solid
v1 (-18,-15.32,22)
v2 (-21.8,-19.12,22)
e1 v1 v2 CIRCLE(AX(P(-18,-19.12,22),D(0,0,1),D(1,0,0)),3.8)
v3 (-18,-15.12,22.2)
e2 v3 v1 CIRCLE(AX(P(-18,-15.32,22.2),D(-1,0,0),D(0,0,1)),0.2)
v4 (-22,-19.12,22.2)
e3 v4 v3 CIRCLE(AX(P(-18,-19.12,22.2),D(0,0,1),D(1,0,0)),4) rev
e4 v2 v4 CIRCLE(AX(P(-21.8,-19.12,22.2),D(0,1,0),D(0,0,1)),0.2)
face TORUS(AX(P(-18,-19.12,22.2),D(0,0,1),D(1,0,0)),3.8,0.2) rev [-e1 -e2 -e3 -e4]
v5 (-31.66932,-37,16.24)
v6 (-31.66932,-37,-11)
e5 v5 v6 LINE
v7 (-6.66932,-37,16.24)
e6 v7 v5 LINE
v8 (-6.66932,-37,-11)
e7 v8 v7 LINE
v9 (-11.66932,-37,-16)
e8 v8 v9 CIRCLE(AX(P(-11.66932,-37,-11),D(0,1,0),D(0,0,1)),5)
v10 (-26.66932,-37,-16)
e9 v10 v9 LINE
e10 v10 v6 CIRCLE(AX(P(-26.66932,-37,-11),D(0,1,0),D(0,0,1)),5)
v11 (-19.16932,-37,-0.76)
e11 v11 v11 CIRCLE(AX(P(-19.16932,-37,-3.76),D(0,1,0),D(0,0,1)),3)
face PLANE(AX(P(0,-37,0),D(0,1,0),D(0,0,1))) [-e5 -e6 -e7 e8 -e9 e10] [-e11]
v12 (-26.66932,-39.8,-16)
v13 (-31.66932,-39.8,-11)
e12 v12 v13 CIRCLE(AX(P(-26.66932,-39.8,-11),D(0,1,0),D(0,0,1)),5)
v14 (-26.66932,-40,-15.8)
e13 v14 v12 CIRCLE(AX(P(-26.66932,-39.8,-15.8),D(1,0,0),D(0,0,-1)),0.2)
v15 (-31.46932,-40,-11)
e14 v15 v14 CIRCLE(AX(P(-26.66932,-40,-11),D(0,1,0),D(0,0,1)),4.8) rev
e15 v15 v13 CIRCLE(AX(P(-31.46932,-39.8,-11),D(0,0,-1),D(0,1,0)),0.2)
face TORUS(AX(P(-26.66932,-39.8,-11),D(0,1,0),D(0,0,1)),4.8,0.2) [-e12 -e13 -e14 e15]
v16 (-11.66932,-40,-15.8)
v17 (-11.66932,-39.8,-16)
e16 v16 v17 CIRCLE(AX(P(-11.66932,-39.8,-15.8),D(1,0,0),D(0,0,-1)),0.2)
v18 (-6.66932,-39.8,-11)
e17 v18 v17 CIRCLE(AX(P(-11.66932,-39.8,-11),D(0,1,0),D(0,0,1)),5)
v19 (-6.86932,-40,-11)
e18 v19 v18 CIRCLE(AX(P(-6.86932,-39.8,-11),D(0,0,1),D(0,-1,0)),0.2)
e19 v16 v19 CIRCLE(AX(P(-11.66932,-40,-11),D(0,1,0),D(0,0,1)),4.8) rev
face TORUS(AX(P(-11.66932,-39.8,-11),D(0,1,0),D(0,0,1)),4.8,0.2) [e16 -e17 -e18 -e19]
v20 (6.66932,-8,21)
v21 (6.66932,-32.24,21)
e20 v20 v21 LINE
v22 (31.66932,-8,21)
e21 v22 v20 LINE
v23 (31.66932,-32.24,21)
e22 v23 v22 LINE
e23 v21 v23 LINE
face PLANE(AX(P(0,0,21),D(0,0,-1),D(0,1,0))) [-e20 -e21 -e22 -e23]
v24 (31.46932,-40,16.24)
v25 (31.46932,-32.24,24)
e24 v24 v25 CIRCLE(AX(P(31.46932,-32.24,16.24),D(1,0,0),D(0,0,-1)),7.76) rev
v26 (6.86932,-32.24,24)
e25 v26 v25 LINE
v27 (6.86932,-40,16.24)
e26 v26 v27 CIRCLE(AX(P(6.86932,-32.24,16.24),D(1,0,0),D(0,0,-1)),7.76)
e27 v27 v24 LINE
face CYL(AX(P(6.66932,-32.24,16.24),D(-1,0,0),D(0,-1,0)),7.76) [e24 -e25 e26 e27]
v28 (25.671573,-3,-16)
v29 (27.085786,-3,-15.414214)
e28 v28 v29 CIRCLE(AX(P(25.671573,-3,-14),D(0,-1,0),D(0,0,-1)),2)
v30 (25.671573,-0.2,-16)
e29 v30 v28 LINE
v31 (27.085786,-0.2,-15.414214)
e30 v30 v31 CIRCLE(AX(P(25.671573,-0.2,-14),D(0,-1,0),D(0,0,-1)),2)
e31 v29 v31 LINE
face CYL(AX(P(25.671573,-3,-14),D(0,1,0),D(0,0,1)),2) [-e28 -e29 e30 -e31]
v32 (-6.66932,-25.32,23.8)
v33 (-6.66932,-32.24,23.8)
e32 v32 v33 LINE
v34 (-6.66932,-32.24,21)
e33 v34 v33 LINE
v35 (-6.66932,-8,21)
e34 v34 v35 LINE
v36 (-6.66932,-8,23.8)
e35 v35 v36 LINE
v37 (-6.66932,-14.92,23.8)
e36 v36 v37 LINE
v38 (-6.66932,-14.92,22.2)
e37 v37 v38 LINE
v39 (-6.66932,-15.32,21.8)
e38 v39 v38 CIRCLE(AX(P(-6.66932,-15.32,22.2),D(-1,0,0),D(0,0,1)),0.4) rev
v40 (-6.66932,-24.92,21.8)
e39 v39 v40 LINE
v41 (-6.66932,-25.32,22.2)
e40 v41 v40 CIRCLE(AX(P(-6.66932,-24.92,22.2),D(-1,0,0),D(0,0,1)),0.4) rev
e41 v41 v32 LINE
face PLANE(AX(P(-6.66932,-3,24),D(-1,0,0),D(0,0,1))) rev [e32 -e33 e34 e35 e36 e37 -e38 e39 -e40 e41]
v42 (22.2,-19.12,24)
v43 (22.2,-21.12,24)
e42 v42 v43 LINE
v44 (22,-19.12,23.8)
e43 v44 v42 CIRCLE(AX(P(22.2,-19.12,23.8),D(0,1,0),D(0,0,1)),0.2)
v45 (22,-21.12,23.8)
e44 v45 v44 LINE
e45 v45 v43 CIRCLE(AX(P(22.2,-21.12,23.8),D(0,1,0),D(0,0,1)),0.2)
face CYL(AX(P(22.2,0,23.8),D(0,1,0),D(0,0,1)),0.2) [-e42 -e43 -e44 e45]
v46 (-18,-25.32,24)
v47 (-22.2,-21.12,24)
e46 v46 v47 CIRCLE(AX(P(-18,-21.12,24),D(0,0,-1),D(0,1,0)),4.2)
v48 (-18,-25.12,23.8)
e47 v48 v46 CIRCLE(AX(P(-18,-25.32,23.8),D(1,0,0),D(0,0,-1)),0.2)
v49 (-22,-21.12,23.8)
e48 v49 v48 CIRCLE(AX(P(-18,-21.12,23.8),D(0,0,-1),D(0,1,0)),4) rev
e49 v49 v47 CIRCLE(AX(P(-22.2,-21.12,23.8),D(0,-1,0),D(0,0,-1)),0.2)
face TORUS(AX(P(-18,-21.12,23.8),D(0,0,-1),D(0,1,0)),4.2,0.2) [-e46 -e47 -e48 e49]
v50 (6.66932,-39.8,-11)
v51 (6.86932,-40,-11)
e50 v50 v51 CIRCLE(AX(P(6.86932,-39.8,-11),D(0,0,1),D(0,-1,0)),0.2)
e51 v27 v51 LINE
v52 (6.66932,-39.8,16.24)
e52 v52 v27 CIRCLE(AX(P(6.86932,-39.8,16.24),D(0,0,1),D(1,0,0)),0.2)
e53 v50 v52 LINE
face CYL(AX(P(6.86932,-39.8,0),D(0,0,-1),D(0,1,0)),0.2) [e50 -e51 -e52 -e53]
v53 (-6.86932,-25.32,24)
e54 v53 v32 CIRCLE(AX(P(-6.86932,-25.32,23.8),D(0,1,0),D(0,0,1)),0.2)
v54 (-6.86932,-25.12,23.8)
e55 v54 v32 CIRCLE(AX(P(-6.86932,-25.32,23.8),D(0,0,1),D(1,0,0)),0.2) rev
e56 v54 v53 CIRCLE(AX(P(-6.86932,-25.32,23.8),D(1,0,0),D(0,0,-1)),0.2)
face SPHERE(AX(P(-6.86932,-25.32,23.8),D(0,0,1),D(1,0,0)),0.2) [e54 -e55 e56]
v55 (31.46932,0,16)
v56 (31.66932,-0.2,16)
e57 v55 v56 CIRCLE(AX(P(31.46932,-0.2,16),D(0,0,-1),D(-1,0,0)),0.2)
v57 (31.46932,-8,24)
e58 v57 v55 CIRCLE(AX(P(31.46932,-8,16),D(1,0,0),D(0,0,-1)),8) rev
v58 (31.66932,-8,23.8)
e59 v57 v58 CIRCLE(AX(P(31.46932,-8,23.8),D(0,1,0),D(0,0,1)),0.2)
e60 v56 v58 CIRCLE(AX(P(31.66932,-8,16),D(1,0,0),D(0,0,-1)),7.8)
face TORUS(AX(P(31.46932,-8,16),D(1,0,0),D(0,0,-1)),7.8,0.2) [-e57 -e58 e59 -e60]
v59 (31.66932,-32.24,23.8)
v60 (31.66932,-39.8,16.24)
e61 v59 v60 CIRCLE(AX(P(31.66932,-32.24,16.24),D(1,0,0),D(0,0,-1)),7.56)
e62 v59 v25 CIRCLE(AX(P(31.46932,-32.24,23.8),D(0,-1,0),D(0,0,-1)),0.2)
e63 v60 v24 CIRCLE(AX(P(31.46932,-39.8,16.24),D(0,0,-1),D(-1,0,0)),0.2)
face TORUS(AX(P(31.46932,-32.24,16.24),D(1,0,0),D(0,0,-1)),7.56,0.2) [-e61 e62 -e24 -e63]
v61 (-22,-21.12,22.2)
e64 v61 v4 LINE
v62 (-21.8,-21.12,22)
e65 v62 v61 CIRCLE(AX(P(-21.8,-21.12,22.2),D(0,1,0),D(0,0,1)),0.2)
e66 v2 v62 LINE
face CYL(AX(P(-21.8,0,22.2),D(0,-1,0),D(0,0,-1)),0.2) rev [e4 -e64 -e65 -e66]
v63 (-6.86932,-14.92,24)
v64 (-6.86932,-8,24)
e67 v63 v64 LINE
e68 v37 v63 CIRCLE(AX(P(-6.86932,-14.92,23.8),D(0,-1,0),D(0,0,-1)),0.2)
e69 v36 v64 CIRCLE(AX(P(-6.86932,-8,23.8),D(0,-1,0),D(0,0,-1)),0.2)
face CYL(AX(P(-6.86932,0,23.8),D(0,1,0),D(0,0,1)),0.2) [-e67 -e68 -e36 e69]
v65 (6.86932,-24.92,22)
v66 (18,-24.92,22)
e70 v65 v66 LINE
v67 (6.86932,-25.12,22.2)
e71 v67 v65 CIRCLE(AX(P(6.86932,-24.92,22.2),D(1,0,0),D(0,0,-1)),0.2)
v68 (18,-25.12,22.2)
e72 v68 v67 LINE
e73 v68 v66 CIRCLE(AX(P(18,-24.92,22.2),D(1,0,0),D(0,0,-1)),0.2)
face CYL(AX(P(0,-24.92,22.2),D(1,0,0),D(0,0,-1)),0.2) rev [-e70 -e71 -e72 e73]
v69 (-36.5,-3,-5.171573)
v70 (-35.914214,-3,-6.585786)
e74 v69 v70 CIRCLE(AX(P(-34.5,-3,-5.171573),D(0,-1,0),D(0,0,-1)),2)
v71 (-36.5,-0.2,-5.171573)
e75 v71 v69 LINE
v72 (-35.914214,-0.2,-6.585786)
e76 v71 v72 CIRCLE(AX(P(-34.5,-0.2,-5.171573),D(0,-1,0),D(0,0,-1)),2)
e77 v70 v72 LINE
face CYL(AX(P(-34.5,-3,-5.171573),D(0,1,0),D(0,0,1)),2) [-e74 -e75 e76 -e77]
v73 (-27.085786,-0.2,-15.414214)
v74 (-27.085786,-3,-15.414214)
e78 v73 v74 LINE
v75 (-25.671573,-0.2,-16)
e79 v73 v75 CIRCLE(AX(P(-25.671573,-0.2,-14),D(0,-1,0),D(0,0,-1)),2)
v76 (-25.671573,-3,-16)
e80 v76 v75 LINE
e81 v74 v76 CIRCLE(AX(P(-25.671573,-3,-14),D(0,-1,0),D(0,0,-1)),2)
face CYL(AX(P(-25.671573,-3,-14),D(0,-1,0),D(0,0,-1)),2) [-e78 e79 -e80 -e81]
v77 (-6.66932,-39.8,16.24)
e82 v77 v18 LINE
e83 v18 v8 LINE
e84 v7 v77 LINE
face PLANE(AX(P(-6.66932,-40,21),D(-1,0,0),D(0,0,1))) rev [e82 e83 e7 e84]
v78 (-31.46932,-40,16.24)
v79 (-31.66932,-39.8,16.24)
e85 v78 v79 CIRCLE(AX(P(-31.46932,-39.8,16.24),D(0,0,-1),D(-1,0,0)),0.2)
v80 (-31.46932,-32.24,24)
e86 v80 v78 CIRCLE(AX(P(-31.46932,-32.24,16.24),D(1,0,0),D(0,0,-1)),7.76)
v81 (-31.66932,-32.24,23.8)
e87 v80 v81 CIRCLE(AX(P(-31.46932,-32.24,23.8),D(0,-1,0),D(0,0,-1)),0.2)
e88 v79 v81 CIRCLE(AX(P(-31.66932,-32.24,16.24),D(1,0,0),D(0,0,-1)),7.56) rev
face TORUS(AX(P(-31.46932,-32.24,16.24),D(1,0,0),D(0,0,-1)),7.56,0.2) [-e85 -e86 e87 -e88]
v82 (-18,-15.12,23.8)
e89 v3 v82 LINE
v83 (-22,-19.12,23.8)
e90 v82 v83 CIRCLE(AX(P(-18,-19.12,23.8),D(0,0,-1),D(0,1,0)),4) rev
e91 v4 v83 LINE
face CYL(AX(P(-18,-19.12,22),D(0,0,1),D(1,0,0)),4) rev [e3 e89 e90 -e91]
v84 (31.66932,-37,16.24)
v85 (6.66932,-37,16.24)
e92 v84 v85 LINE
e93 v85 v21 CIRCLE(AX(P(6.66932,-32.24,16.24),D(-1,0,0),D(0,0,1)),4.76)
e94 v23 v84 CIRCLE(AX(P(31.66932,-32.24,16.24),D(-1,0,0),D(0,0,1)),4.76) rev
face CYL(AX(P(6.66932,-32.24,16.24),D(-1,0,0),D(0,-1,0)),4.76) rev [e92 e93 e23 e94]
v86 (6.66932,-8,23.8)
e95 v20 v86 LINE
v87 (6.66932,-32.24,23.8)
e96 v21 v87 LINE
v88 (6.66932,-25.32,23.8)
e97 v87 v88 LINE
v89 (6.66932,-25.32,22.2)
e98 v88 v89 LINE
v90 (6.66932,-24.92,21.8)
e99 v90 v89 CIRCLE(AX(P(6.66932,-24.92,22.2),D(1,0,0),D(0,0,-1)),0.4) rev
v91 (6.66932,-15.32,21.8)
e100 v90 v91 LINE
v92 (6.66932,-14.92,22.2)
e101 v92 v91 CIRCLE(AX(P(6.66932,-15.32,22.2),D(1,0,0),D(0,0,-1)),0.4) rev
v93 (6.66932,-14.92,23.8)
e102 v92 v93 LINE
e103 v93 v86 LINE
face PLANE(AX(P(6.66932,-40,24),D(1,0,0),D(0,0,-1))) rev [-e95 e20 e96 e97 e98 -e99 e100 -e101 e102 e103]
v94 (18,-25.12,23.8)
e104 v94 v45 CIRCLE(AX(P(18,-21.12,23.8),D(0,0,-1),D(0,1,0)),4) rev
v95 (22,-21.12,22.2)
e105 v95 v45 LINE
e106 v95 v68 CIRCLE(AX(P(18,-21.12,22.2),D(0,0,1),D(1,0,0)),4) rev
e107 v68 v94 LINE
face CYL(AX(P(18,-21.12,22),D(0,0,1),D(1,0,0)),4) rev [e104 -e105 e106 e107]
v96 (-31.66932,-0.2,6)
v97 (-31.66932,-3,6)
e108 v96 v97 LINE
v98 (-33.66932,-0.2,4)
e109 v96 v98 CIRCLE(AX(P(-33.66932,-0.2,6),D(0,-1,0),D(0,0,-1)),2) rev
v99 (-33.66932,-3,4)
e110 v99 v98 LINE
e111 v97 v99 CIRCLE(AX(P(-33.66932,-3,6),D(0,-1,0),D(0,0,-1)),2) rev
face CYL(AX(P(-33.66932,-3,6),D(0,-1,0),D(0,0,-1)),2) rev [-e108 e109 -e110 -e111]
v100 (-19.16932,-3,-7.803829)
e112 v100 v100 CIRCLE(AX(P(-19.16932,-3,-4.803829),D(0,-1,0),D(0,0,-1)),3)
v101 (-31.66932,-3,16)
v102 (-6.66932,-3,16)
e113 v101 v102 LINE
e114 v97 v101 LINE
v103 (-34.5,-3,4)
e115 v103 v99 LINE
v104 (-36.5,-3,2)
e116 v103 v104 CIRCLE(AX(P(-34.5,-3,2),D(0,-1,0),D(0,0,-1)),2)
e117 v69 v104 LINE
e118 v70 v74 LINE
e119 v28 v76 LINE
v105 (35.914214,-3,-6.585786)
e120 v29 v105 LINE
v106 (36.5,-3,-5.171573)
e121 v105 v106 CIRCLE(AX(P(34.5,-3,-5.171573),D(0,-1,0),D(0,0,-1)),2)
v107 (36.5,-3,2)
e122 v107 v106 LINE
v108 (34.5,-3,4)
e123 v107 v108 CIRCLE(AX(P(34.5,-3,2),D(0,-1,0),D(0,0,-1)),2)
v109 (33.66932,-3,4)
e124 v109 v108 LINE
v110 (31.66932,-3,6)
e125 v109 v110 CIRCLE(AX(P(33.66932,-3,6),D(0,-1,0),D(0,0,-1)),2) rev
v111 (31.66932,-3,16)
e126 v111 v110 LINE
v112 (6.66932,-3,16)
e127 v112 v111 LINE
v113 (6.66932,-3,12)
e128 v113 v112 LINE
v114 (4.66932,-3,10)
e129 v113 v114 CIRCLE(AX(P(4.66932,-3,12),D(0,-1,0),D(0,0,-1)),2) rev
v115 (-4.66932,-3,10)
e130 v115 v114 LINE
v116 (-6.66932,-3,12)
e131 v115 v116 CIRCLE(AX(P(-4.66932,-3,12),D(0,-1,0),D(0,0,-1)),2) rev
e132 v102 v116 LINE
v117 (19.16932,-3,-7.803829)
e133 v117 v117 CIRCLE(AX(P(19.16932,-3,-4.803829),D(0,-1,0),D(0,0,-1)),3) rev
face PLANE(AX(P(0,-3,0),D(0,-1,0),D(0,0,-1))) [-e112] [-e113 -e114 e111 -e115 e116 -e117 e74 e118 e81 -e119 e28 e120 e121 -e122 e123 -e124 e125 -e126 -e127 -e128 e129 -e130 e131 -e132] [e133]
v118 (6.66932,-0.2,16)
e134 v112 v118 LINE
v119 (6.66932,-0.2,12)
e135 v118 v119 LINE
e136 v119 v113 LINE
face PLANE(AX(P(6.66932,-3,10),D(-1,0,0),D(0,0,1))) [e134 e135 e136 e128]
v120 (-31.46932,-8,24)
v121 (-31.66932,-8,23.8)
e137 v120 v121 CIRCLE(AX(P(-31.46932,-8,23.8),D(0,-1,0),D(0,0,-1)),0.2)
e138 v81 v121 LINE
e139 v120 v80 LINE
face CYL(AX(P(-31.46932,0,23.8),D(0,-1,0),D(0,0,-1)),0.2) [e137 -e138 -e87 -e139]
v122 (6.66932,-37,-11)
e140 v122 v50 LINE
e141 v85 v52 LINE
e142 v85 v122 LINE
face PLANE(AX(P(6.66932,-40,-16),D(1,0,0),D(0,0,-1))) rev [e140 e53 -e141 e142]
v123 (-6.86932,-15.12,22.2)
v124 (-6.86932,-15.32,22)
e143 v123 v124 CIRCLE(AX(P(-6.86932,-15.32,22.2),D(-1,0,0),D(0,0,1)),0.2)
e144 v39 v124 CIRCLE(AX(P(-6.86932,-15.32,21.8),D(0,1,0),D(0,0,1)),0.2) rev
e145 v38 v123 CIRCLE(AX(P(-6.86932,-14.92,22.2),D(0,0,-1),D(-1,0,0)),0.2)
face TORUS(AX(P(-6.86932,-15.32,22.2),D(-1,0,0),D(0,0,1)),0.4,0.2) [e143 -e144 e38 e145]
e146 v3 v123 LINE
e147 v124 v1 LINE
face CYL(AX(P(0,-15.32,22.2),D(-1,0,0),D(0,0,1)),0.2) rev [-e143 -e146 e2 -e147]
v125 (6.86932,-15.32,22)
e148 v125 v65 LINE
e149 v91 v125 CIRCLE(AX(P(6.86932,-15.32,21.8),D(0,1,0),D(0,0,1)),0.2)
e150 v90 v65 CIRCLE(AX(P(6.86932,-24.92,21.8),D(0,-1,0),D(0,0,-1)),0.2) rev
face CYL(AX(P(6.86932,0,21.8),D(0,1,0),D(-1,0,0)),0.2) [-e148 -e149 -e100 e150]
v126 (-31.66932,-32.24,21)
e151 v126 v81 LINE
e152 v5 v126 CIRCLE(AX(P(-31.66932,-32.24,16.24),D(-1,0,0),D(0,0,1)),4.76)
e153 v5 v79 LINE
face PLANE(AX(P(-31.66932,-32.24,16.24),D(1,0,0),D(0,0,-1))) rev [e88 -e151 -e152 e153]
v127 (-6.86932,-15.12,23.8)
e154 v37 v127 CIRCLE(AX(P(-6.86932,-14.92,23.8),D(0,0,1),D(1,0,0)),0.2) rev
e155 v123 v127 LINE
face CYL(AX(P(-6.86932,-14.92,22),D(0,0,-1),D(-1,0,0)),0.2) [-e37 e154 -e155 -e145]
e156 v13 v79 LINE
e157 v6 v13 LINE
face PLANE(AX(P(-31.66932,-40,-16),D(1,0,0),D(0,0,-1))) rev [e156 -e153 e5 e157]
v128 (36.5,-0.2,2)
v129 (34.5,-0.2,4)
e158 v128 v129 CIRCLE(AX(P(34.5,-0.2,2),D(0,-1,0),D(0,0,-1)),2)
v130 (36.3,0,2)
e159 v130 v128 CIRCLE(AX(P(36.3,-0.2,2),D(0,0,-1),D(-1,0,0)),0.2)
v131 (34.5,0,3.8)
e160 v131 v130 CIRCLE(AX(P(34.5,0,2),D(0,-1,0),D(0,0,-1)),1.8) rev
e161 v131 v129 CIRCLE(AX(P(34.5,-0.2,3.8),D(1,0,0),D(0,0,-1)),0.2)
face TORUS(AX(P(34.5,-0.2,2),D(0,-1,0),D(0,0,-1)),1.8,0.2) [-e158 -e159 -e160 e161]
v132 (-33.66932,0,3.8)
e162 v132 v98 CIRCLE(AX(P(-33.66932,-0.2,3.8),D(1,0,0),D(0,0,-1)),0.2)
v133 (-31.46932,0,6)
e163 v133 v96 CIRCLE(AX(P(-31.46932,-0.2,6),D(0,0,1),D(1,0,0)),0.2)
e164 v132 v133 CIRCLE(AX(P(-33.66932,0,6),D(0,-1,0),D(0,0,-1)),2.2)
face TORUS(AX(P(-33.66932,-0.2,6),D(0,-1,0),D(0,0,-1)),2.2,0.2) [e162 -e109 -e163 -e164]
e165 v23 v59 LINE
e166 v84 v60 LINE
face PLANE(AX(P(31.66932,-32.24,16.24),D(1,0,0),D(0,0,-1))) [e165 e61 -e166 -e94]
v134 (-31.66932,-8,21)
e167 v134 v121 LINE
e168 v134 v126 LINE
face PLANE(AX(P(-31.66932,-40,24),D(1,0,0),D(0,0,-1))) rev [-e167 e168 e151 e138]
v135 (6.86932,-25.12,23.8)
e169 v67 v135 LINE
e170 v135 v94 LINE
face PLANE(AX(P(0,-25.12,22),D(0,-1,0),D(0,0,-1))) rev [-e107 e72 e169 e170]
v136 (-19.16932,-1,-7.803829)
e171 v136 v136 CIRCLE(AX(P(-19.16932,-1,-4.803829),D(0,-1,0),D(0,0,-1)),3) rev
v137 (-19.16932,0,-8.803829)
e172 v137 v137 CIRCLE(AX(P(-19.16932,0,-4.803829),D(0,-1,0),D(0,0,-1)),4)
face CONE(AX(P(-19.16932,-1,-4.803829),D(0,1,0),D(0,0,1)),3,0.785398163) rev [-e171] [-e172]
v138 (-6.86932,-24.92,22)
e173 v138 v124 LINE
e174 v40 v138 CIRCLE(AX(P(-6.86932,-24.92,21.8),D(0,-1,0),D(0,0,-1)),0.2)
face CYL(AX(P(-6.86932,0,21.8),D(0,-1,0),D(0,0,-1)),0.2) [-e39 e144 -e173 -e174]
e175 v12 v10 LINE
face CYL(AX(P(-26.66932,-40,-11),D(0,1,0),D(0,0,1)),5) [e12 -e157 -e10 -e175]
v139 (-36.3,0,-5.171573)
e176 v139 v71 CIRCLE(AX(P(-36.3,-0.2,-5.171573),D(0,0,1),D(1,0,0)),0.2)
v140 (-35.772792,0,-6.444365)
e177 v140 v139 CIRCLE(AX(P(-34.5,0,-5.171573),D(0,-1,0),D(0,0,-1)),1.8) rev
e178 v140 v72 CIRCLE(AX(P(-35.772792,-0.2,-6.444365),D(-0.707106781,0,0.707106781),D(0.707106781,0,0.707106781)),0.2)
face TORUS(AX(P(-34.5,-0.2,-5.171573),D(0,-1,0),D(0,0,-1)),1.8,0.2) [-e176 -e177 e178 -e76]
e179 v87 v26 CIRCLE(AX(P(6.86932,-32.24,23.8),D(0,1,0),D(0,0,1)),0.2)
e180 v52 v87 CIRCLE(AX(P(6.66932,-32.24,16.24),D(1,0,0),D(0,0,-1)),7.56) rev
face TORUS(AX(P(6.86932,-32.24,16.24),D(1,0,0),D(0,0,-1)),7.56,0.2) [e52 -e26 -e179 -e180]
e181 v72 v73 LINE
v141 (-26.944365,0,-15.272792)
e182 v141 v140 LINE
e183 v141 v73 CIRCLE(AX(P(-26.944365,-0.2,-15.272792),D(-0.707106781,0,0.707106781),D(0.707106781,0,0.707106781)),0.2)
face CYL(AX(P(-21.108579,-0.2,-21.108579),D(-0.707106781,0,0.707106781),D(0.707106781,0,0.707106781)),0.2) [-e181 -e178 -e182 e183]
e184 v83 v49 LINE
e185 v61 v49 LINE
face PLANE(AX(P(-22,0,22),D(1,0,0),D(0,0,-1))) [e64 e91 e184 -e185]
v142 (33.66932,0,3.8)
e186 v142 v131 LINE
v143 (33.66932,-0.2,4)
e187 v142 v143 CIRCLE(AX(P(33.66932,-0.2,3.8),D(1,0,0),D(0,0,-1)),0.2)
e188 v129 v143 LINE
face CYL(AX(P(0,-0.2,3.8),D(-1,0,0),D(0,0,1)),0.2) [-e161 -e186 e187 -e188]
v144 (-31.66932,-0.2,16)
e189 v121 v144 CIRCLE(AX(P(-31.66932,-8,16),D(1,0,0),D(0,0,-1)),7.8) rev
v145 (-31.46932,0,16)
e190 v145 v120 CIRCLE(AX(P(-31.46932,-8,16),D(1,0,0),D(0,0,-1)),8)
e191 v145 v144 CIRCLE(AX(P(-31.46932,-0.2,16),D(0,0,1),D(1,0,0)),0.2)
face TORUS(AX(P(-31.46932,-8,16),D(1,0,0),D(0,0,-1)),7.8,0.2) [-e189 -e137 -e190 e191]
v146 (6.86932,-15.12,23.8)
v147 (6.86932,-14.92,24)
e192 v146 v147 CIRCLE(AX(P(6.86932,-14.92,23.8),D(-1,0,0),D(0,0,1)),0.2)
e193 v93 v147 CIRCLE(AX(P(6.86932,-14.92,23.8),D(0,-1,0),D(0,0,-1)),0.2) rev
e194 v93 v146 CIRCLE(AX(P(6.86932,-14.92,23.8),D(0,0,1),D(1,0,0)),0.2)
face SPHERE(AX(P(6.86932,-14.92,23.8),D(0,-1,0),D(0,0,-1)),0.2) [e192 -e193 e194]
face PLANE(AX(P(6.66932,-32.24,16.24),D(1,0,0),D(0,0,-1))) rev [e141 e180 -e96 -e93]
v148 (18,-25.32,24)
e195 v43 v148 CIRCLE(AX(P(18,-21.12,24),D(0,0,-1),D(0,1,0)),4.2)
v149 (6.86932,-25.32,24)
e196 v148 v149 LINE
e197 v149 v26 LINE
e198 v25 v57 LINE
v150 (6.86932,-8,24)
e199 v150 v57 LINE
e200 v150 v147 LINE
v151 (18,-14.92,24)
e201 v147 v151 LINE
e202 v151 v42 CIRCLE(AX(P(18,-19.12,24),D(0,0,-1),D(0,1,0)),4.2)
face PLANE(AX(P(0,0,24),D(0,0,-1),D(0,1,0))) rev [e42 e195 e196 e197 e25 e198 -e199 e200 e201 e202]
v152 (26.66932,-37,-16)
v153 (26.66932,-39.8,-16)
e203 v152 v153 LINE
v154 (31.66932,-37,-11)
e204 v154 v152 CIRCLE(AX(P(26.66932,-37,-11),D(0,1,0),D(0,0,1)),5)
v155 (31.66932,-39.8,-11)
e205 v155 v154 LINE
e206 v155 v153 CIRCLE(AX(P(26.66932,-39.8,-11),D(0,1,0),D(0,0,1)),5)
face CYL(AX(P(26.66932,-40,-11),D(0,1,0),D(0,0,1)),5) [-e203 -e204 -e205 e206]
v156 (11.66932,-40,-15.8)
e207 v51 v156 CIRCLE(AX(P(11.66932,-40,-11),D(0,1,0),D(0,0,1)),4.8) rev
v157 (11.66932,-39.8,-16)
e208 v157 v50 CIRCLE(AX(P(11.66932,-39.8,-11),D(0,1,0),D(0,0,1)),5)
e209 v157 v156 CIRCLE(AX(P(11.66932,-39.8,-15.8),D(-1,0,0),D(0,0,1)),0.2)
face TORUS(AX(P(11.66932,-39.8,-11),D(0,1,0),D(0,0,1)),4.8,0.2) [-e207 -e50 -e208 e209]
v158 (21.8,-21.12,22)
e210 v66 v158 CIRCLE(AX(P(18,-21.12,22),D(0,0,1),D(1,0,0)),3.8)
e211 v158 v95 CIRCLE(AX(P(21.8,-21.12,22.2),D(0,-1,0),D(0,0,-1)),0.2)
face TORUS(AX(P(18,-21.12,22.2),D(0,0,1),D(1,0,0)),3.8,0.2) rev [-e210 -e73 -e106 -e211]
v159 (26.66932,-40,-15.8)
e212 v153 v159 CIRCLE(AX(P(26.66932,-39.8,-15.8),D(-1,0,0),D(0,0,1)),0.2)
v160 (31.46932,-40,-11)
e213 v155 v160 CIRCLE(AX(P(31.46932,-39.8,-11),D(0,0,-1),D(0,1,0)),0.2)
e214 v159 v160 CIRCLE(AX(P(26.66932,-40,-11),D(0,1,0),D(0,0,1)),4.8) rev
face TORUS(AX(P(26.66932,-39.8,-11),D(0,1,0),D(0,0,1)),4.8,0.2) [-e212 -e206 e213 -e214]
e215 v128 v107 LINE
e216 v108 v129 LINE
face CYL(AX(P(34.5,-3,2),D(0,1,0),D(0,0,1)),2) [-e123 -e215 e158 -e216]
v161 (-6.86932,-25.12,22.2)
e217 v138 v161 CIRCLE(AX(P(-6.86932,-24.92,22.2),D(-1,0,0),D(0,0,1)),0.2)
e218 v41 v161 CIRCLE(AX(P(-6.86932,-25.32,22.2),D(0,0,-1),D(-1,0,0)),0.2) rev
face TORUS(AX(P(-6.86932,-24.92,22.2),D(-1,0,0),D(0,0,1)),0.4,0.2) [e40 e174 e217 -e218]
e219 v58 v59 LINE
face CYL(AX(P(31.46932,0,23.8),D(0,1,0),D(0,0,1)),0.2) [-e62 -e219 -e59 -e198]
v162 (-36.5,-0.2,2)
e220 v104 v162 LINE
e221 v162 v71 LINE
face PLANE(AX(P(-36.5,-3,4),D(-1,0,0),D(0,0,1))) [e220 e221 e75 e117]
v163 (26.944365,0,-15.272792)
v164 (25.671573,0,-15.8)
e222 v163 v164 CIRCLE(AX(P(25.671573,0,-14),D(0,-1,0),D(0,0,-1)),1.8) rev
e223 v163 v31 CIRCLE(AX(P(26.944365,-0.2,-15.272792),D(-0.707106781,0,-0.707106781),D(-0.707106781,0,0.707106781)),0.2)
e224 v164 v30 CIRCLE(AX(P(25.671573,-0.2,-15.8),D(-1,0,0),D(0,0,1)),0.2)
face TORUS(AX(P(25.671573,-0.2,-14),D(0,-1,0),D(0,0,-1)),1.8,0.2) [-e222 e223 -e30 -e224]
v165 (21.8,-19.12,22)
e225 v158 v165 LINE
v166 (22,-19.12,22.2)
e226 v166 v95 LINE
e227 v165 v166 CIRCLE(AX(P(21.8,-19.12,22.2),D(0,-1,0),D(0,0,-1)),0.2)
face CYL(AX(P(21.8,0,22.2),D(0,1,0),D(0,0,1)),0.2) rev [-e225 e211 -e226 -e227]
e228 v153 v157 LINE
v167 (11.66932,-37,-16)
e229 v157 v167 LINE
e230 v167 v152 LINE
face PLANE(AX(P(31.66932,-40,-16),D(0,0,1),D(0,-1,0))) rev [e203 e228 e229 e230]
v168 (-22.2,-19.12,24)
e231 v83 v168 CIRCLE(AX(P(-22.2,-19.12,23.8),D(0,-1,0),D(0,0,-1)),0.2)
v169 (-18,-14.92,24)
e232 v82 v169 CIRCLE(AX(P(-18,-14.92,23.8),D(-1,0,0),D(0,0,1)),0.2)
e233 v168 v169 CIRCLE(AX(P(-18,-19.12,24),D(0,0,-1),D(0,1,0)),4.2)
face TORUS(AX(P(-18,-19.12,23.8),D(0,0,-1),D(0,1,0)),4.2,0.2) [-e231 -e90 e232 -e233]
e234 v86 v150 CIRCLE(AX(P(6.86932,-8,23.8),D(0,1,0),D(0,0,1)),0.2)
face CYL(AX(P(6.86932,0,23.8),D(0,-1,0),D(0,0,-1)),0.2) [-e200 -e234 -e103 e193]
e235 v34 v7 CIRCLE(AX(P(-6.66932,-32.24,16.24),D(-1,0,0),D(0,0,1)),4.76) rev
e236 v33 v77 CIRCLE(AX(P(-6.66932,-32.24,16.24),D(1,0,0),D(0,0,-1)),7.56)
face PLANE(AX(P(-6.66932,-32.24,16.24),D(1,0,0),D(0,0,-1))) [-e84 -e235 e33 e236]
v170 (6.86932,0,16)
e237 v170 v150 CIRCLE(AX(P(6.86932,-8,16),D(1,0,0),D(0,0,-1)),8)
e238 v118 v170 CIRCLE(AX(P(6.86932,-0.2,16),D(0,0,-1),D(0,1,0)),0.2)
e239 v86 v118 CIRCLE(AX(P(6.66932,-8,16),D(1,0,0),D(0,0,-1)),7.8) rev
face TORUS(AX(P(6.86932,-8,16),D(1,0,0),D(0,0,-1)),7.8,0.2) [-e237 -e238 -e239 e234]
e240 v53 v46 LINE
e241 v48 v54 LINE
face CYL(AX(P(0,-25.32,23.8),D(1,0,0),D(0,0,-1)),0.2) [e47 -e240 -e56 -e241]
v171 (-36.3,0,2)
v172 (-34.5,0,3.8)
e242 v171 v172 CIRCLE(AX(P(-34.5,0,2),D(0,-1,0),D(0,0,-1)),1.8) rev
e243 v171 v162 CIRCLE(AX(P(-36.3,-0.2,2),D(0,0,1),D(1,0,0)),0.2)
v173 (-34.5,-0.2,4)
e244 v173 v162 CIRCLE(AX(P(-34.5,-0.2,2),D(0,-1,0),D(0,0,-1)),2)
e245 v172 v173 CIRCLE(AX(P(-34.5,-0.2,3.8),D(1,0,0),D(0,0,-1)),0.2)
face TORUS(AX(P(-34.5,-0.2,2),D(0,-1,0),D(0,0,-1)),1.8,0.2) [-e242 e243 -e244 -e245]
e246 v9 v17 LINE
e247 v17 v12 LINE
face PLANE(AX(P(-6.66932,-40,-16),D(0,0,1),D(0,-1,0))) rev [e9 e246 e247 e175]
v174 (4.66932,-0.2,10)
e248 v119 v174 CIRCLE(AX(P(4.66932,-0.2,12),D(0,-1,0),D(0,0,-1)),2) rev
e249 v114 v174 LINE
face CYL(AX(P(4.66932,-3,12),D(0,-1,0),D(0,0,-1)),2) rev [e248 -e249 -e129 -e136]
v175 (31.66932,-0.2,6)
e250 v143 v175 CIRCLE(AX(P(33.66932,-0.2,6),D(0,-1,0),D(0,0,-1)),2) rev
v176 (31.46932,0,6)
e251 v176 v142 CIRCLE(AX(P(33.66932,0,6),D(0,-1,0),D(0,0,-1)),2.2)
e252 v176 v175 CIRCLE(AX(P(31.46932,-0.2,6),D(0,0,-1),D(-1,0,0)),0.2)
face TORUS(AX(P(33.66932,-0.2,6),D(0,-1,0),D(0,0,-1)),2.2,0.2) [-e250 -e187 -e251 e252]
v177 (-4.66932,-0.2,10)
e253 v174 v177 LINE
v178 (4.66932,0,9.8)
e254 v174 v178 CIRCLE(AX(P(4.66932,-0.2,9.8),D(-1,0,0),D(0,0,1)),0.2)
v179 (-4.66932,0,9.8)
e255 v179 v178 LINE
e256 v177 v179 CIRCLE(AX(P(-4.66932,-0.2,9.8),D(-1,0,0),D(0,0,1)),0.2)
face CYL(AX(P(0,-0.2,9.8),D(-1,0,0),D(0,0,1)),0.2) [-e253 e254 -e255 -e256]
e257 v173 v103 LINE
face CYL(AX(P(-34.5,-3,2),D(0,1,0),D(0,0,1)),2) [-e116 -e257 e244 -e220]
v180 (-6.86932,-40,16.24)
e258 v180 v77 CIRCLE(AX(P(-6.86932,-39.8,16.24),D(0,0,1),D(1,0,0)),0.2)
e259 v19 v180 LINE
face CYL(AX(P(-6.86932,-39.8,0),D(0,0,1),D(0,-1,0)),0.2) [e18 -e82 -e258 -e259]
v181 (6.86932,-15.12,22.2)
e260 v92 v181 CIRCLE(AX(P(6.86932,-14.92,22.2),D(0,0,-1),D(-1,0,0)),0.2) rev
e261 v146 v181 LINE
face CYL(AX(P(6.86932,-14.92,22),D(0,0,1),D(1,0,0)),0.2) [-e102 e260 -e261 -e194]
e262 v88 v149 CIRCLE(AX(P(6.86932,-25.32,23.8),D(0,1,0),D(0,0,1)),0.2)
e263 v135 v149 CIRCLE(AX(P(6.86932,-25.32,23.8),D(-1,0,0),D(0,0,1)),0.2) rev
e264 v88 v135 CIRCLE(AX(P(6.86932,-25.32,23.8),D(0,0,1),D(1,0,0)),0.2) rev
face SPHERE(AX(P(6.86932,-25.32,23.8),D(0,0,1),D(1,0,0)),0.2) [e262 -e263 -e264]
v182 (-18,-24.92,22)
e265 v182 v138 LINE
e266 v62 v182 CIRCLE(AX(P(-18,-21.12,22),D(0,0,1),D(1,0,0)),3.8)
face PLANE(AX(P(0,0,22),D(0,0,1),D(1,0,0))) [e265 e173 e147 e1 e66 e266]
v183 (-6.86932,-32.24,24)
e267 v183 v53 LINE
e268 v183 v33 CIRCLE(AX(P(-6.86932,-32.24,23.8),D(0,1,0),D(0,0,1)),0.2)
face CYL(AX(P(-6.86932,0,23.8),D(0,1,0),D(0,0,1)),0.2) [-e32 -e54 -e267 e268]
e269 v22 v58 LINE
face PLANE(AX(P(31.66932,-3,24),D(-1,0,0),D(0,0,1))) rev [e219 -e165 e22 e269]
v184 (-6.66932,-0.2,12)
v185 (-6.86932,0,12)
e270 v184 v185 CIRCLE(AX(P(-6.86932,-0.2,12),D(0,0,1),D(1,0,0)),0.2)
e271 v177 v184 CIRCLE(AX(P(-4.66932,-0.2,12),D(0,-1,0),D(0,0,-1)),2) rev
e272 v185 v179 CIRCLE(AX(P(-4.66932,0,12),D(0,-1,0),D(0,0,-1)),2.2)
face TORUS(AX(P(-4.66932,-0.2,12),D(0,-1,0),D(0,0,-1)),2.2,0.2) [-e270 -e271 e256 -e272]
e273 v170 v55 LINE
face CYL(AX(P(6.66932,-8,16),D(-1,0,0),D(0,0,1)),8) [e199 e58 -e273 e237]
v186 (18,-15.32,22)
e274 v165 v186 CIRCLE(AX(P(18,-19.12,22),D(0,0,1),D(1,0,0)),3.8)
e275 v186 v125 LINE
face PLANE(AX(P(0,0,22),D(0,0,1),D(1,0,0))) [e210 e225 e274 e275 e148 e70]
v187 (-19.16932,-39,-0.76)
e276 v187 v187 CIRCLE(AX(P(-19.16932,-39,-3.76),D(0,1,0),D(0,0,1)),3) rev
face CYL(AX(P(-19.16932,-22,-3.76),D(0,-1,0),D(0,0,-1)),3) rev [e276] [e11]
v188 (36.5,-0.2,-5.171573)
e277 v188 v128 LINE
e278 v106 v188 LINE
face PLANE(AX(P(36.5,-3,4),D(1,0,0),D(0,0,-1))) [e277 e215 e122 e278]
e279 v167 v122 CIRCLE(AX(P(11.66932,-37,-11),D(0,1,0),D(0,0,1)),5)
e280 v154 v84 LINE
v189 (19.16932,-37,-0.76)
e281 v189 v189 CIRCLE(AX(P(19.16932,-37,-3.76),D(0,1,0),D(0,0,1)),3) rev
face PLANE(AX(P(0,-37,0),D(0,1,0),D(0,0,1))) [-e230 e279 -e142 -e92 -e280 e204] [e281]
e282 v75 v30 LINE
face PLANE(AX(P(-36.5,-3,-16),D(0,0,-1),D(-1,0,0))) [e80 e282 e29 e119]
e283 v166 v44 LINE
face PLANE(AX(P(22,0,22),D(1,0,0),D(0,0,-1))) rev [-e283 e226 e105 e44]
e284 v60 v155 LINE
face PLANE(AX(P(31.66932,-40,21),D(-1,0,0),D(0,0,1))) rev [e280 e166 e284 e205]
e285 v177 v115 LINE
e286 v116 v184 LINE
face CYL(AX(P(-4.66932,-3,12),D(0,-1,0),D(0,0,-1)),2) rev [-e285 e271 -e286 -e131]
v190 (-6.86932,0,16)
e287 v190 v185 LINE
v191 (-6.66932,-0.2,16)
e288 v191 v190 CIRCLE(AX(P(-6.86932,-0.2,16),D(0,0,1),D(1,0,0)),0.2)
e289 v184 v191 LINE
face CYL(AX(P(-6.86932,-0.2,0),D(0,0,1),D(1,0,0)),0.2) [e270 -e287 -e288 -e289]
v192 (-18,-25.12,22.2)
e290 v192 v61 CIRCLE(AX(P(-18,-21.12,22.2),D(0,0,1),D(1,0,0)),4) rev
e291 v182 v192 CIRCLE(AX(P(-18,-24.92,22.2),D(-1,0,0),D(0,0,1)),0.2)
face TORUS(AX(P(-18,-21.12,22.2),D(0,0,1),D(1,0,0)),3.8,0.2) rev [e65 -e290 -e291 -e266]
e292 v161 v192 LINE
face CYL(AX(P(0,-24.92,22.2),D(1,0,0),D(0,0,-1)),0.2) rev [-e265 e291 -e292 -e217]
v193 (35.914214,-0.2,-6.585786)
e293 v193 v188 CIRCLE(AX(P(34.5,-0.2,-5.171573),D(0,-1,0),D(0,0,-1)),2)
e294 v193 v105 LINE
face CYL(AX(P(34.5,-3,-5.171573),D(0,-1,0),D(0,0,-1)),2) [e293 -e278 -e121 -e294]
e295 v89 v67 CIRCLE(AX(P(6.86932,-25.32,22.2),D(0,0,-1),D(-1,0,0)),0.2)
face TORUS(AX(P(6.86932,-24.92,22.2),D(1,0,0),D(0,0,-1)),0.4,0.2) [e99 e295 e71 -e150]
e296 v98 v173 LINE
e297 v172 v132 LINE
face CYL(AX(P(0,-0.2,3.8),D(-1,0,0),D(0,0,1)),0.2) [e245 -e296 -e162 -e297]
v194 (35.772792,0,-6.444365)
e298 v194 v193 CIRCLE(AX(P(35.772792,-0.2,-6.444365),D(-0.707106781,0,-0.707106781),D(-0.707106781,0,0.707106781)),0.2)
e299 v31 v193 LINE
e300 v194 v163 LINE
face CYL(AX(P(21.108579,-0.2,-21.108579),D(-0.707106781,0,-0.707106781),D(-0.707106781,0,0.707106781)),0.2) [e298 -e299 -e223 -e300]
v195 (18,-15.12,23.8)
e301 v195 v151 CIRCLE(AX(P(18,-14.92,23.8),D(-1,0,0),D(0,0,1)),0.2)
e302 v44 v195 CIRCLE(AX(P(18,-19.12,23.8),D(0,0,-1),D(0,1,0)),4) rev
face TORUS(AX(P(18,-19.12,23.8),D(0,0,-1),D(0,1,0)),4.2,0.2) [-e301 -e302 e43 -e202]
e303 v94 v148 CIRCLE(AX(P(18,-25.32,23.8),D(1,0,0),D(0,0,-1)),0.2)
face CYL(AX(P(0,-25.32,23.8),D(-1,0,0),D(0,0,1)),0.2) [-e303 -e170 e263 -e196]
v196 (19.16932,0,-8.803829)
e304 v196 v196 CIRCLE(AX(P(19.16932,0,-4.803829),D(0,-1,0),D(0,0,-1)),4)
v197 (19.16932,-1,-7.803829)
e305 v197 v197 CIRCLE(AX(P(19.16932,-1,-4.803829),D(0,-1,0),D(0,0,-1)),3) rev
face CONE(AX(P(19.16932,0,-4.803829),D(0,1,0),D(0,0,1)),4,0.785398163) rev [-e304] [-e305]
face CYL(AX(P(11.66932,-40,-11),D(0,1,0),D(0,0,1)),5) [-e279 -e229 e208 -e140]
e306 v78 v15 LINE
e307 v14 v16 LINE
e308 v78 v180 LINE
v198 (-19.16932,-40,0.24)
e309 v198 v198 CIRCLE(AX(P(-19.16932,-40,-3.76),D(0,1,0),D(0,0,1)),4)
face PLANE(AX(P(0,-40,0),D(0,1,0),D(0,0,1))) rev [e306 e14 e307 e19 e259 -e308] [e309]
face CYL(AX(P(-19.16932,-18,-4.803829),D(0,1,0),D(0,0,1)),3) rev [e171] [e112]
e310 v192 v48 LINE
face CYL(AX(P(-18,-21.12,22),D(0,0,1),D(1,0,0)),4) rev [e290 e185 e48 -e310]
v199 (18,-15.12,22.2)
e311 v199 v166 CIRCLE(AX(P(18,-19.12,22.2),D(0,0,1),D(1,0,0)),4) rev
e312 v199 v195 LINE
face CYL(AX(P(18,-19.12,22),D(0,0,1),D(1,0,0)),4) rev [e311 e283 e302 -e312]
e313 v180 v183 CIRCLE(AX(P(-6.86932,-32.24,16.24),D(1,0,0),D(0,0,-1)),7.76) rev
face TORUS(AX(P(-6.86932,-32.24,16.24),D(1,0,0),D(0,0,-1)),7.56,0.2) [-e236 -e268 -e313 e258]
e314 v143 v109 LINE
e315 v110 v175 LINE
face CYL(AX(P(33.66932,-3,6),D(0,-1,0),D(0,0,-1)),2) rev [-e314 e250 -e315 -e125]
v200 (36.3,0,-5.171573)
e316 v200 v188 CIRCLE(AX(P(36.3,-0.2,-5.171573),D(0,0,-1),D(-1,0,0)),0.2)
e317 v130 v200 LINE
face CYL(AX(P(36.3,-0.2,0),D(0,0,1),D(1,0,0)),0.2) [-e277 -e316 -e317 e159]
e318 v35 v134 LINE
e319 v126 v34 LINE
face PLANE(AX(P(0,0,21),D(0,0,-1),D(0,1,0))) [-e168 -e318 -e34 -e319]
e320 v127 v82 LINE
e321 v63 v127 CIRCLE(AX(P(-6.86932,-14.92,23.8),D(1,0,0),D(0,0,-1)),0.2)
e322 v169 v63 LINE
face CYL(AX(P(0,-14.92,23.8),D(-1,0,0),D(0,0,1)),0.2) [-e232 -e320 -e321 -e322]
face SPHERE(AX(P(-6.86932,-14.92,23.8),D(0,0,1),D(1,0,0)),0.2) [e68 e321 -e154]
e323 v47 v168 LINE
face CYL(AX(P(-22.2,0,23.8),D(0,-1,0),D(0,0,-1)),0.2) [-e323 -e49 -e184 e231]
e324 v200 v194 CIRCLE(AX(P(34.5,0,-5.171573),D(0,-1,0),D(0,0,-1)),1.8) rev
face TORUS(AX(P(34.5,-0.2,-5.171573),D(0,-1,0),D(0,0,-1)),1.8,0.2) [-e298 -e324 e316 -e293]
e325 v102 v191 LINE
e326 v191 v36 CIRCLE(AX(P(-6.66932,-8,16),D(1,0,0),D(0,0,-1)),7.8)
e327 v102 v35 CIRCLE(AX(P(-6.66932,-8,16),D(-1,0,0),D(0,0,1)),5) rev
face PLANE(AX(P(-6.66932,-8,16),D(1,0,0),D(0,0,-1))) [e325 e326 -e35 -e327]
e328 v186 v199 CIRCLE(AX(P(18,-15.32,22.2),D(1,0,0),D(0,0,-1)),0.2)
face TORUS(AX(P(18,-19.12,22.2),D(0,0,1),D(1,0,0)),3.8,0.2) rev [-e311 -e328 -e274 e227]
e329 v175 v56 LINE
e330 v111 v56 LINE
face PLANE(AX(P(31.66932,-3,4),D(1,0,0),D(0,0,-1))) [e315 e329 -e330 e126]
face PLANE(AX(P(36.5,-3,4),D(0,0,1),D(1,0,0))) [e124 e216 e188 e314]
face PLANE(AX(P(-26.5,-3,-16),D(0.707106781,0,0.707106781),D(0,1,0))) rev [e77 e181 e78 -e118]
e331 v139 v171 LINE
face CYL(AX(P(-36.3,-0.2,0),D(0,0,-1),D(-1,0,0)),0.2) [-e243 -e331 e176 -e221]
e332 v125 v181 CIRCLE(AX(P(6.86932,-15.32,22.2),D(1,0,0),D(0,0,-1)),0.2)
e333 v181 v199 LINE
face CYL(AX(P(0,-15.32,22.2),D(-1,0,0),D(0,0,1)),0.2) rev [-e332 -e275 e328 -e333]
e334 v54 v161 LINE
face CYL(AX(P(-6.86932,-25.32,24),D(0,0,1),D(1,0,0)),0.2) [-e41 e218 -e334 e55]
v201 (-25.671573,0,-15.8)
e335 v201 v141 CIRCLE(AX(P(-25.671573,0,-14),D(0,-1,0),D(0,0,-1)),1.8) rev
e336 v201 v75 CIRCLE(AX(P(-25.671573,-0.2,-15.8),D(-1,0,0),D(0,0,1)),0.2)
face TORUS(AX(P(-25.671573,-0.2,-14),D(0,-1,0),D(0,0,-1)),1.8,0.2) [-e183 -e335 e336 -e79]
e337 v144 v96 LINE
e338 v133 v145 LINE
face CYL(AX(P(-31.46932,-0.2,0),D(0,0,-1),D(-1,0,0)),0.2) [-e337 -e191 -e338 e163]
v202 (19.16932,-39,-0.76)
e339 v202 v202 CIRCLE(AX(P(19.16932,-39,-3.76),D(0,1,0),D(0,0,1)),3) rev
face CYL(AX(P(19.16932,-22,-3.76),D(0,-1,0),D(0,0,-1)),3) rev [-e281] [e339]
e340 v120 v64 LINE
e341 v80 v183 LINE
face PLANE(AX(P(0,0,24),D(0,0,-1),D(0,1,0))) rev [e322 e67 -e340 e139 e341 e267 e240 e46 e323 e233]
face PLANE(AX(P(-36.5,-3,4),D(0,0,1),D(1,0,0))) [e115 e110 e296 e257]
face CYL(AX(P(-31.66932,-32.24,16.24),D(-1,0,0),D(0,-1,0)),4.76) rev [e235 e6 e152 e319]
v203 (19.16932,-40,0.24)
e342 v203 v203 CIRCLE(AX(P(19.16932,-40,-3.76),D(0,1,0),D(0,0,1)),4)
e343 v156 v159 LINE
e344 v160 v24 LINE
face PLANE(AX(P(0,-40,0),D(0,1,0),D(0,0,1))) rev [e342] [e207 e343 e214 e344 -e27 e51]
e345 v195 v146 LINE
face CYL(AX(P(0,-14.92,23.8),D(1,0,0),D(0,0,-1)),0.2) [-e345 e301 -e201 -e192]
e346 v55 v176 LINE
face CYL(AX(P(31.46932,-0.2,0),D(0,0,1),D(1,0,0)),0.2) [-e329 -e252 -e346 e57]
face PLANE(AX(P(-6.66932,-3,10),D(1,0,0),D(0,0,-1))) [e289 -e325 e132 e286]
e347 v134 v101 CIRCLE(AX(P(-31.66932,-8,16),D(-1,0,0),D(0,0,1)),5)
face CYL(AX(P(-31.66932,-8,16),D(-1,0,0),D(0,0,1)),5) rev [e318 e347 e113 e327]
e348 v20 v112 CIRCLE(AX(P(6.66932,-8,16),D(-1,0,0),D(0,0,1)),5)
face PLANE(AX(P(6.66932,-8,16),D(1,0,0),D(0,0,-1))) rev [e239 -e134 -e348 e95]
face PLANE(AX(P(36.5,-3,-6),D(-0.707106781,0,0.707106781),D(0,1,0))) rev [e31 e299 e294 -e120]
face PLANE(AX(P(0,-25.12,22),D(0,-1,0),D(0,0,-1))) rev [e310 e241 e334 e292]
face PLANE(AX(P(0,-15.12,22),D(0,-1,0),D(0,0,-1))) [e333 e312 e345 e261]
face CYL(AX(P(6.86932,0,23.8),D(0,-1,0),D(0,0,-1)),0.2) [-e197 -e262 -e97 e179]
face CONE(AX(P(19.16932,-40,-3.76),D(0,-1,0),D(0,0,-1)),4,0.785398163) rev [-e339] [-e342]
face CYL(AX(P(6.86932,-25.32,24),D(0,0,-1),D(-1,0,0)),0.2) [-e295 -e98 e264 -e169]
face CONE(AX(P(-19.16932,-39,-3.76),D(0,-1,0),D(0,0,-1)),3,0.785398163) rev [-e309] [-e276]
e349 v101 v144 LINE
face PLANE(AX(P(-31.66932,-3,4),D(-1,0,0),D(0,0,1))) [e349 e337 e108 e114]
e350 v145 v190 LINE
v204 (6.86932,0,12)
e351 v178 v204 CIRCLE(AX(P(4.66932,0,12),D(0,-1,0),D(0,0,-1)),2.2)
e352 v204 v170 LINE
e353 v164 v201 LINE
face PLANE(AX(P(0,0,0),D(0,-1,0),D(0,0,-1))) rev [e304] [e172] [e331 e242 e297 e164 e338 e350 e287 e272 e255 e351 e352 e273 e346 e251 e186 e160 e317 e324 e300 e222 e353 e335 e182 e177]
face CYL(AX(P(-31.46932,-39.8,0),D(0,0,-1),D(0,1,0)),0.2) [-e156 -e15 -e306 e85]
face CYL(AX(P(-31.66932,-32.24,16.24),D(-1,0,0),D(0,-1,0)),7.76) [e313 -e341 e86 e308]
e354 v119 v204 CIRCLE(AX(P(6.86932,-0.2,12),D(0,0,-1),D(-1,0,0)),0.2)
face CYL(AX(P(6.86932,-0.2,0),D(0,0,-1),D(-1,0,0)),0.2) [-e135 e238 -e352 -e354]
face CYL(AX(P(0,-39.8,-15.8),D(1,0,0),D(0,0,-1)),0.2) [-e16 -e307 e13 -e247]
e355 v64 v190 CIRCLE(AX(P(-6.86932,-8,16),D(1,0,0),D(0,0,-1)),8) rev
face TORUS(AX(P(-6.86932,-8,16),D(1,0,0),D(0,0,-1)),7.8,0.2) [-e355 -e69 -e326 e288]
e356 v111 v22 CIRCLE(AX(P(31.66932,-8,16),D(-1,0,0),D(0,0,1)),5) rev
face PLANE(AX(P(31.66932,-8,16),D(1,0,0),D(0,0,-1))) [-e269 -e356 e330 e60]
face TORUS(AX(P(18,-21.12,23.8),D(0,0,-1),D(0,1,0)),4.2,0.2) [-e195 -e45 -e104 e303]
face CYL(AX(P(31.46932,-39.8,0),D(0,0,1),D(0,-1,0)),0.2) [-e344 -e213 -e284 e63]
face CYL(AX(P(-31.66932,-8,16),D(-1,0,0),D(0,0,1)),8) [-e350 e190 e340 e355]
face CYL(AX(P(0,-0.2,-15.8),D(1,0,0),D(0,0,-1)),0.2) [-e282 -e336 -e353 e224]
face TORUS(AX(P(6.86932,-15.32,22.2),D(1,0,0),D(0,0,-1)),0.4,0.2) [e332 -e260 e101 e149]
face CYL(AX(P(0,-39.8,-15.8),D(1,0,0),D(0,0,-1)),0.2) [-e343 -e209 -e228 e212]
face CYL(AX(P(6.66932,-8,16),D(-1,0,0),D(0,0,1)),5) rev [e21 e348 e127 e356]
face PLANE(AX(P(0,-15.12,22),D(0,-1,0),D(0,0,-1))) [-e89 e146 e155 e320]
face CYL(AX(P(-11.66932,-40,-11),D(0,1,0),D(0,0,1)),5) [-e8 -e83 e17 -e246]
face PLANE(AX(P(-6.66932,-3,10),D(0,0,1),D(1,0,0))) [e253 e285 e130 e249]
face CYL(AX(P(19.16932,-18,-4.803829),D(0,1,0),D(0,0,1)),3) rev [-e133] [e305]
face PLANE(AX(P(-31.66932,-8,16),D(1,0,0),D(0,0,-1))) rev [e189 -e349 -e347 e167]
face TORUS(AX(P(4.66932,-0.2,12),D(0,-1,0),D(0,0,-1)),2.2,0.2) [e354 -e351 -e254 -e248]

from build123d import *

# Parameters (mm, degrees)
BASE_FLANGE2_DEPTH             = 3
EDGE_FLANGE1_STRIP_W           = 22
EDGE_FLANGE1_STRIP_H           = 3
EDGE_FLANGE1_STRIP_CUT_DEPTH   = 25
EDGE_FLANGE1_STRIP_2_W         = 22
EDGE_FLANGE1_STRIP_2_H         = 3
EDGE_FLANGE1_STRIP_CUT_2_DEPTH = 25
EDGE_FLANGE1_DEPTH             = 25
EDGE_FLANGE1_BEND_DEPTH        = 25
EDGE_FLANGE2_STRIP_W           = 21.52
EDGE_FLANGE2_STRIP_H           = 3
EDGE_FLANGE2_STRIP_CUT_DEPTH   = 25
EDGE_FLANGE2_STRIP_2_W         = 21.52
EDGE_FLANGE2_STRIP_2_H         = 3
EDGE_FLANGE2_STRIP_CUT_2_DEPTH = 25
EDGE_FLANGE2_DEPTH             = 25
EDGE_FLANGE2_BEND_DEPTH        = 25
CHAMFER1_SIZE                  = 10
FILLET1_R                      = 2
FILLET2_R                      = 2
FILLET3_R                      = 5
SKETCH29_R                     = 3
CUT_EXTRUDE1_DEPTH             = 18
SKETCH30_R                     = 3
CUT_EXTRUDE2_DEPTH             = 18
CHAMFER2_SIZE                  = 1
CUT_EXTRUDE3_DEPTH             = 2
FILLET4_R                      = 0.2


# Sheet-metal steps are written as plain solids
with BuildPart() as part:
    # Sketch2 → Base-Flange2 (new body)
    with BuildSketch(Plane(origin=(0, 0, 0), x_dir=(1, 0, 0), z_dir=(0, 1, 0))):
        Polygon((-36.5, -4), (-36.5, 16), (36.5, 16), (36.5, -4), (31.669319917, -4), (31.669319917, -24), (6.669319917, -24), (6.669319917, -10), (-6.669319917, -10), (-6.669319917, -24), (-31.669319917, -24), (-31.669319917, -4), align=None)
    extrude(amount=-BASE_FLANGE2_DEPTH)

    # Edge-Flange1 strip (across the edge) → Edge-Flange1 strip cut (cut)
    with BuildSketch(Plane(origin=(31.669319917, -3, 24), x_dir=(0, 0, -1), z_dir=(-1, 0, 0))):
        with Locations((-3, -1.5)):
            Rectangle(EDGE_FLANGE1_STRIP_W, EDGE_FLANGE1_STRIP_H)
    extrude(amount=EDGE_FLANGE1_STRIP_CUT_DEPTH, mode=Mode.SUBTRACT)

    # Edge-Flange1 strip 2 (across the edge) → Edge-Flange1 strip cut 2 (cut)
    with BuildSketch(Plane(origin=(-6.669319917, -3, 24), x_dir=(0, 0, -1), z_dir=(-1, 0, 0))):
        with Locations((-3, -1.5)):
            Rectangle(EDGE_FLANGE1_STRIP_2_W, EDGE_FLANGE1_STRIP_2_H)
    extrude(amount=EDGE_FLANGE1_STRIP_CUT_2_DEPTH, mode=Mode.SUBTRACT)

    # Edge-Flange1 section (across the edge) → Edge-Flange1 (add)
    with BuildSketch(Plane(origin=(31.669319917, -3, 24), x_dir=(0, 0, -1), z_dir=(-1, 0, 0))):
        with BuildLine():
            Line((0, 5), (0, 37))
            Line((0, 37), (3, 37))
            Line((3, 37), (3, 5))
            ThreePointArc((3, 5), (4.464466094, 1.464466094), (8, 0))
            Line((8, 0), (8, -3))
            ThreePointArc((8, -3), (2.343145751, -0.656854249), (0, 5))
        make_face()
    extrude(amount=EDGE_FLANGE1_DEPTH)

    # Edge-Flange1 section 2 (across the edge) → Edge-Flange1 bend (add)
    with BuildSketch(Plane(origin=(-6.669319917, -3, 24), x_dir=(0, 0, -1), z_dir=(-1, 0, 0))):
        with BuildLine():
            Line((0, 5), (0, 37))
            Line((0, 37), (3, 37))
            Line((3, 37), (3, 5))
            ThreePointArc((3, 5), (4.464466094, 1.464466094), (8, 0))
            Line((8, 0), (8, -3))
            ThreePointArc((8, -3), (2.343145751, -0.656854249), (0, 5))
        make_face()
    extrude(amount=EDGE_FLANGE1_BEND_DEPTH)

    # Edge-Flange2 strip (across the edge) → Edge-Flange2 strip cut (cut)
    with BuildSketch(Plane(origin=(31.669319917, -40, 21), x_dir=(0, 1, 0), z_dir=(-1, 0, 0))):
        with Locations((-3, -1.5)):
            Rectangle(EDGE_FLANGE2_STRIP_W, EDGE_FLANGE2_STRIP_H)
    extrude(amount=EDGE_FLANGE2_STRIP_CUT_DEPTH, mode=Mode.SUBTRACT)

    # Edge-Flange2 strip 2 (across the edge) → Edge-Flange2 strip cut 2 (cut)
    with BuildSketch(Plane(origin=(-6.669319917, -40, 21), x_dir=(0, 1, 0), z_dir=(-1, 0, 0))):
        with Locations((-3, -1.5)):
            Rectangle(EDGE_FLANGE2_STRIP_2_W, EDGE_FLANGE2_STRIP_2_H)
    extrude(amount=EDGE_FLANGE2_STRIP_CUT_2_DEPTH, mode=Mode.SUBTRACT)

    # Edge-Flange2 section (across the edge) → Edge-Flange2 (add)
    with BuildSketch(Plane(origin=(31.669319917, -40, 21), x_dir=(0, 1, 0), z_dir=(-1, 0, 0))):
        with BuildLine():
            Line((0, 4.76), (0, 37))
            Line((0, 37), (3, 37))
            Line((3, 37), (3, 4.76))
            ThreePointArc((3, 4.76), (4.394171722, 1.394171722), (7.76, 0))
            Line((7.76, 0), (7.76, -3))
            ThreePointArc((7.76, -3), (2.272851378, -0.727148622), (0, 4.76))
        make_face()
    extrude(amount=EDGE_FLANGE2_DEPTH)

    # Edge-Flange2 section 2 (across the edge) → Edge-Flange2 bend (add)
    with BuildSketch(Plane(origin=(-6.669319917, -40, 21), x_dir=(0, 1, 0), z_dir=(-1, 0, 0))):
        with BuildLine():
            Line((0, 4.76), (0, 37))
            Line((0, 37), (3, 37))
            Line((3, 37), (3, 4.76))
            ThreePointArc((3, 4.76), (4.394171722, 1.394171722), (7.76, 0))
            Line((7.76, 0), (7.76, -3))
            ThreePointArc((7.76, -3), (2.272851378, -0.727148622), (0, 4.76))
        make_face()
    extrude(amount=EDGE_FLANGE2_BEND_DEPTH)

    # Chamfer1
    chamfer1_edges = [part.edges().sort_by_distance(p)[0] for p in [
        (-36.5, -1.5, -16),
        (36.5, -1.5, -16),
    ]]
    chamfer(chamfer1_edges, length=CHAMFER1_SIZE)

    # Fillet1
    fillet1_edges = [part.edges().sort_by_distance(p)[0] for p in [
        (26.5, -1.5, -16),
        (-26.5, -1.5, -16),
        (-36.5, -1.5, -6),
        (36.5, -1.5, -6),
        (36.5, -1.5, 4),
        (-36.5, -1.5, 4),
    ]]
    fillet(fillet1_edges, radius=FILLET1_R)

    # Fillet2
    fillet2_edges = [part.edges().sort_by_distance(p)[0] for p in [
        (31.669319917, -1.5, 4),
        (6.669319917, -1.5, 10),
        (-6.669319917, -1.5, 10),
        (-31.669319917, -1.5, 4),
    ]]
    fillet(fillet2_edges, radius=FILLET2_R)

    # Fillet3
    fillet3_edges = [part.edges().sort_by_distance(p)[0] for p in [
        (31.669319917, -38.5, -16),
        (6.669319917, -38.5, -16),
        (-6.669319917, -38.5, -16),
        (-31.669319917, -38.5, -16),
    ]]
    fillet(fillet3_edges, radius=FILLET3_R)

    # Sketch29 → Cut-Extrude1 (cut)
    with BuildSketch(Plane(origin=(0, 0, 0), x_dir=(1, 0, 0), z_dir=(0, 1, 0))):
        with BuildLine():
            ThreePointArc((-19.169319917, 7.803829045), (-22.169319917, 4.803829045), (-19.169319917, 1.803829045))
            Line((-19.169319917, 1.803829045), (-19.169319917, 7.803829045))
        make_face()
        with BuildLine():
            Line((-19.169319917, 7.803829045), (-19.169319917, 1.803829045))
            ThreePointArc((-19.169319917, 1.803829045), (-17.047999573, 2.682508701), (-16.169319917, 4.803829045))
            ThreePointArc((-16.169319917, 4.803829045), (-17.047999573, 6.925149389), (-19.169319917, 7.803829045))
        make_face()
        with Locations(Location((19.169319917, 4.803829045, 0), (0, 0, 270))):
            Circle(SKETCH29_R)
    extrude(amount=-CUT_EXTRUDE1_DEPTH, mode=Mode.SUBTRACT)

    # Sketch30 → Cut-Extrude2 (cut)
    with BuildSketch(Plane.XZ.offset(40)):
        with Locations(Location((-19.169319917, -3.76, 0), (0, 0, 270))):
            Circle(SKETCH30_R)
        with Locations(Location((19.169319917, -3.76, 0), (0, 0, 270))):
            Circle(SKETCH30_R)
    extrude(amount=-CUT_EXTRUDE2_DEPTH, mode=Mode.SUBTRACT)

    # Chamfer2
    chamfer2_edges = [part.edges().sort_by_distance(p)[0] for p in [
        (19.169319917, 0, -7.803829045),
        (-19.169319917, 0, -1.803829045),
        (-19.169319917, -40, -0.76),
        (19.169319917, -40, -0.76),
    ]]
    chamfer(chamfer2_edges, length=CHAMFER2_SIZE)

    # Sketch32 → Cut-Extrude3 (cut)
    with BuildSketch(Plane.XY.offset(24)):
        with BuildLine():
            Line((-18, -25.12), (18, -25.12))
            ThreePointArc((18, -25.12), (20.828427125, -23.948427125), (22, -21.12))
            Line((22, -21.12), (22, -19.12))
            ThreePointArc((22, -19.12), (20.828427125, -16.291572875), (18, -15.12))
            Line((18, -15.12), (-18, -15.12))
            ThreePointArc((-18, -15.12), (-20.828427125, -16.291572875), (-22, -19.12))
            Line((-22, -19.12), (-22, -21.12))
            ThreePointArc((-22, -21.12), (-20.828427125, -23.948427125), (-18, -25.12))
        make_face()
    extrude(amount=-CUT_EXTRUDE3_DEPTH, mode=Mode.SUBTRACT)

    # Fillet4
    fillet4_edges = [part.edges().sort_by_distance(p)[0] for p in [
        (31.669319917, -20.12, 24),
        (-6.669319917, -28.68, 24),
        (31.669319917, -37.727148622, 21.727148622),
        (6.669319917, -37.727148622, 21.727148622),
        (6.669319917, -40, 2.62),
        (-6.669319917, -37.727148622, 21.727148622),
        (-31.669319917, -37.727148622, 21.727148622),
        (-31.669319917, -40, 2.62),
        (-36.5, 0, -1.585786438),
        (0, 0, -16),
        (-31.5, 0, -11),
        (-34.084659958, 0, 4),
        (36.5, 0, -1.585786438),
        (31.5, 0, -11),
        (26.43693974, 0, -15.847759065),
        (36.347759065, 0, -5.93693974),
        (35.914213562, 0, 3.414213562),
        (-26.43693974, 0, -15.847759065),
        (-36.347759065, 0, -5.93693974),
        (-35.914213562, 0, 3.414213562),
        (-31.669319917, 0, 11),
        (0, 0, 10),
        (6.669319917, 0, 14),
        (34.084659958, 0, 4),
        (-32.255106355, 0, 4.585786438),
        (-6.083533479, 0, 10.585786438),
        (6.083533479, 0, 10.585786438),
        (32.255106355, 0, 4.585786438),
        (-19.169319917, -40, -16),
        (-6.669319917, -40, 2.62),
        (-8.133786011, -40, -14.535533906),
        (-30.204853823, -40, -14.535533906),
        (19.169319917, -40, -16),
        (31.669319917, -40, 2.62),
        (30.204853823, -40, -14.535533906),
        (8.133786011, -40, -14.535533906),
        (31.669319917, 0, 11),
        (-6.669319917, 0, 14),
        (6.669319917, -28.68, 24),
        (12.334659958, -15.12, 24),
        (12.334659958, -25.12, 24),
        (6.669319917, -20.12, 22),
        (-6.669319917, -11.56, 24),
        (-22, -20.12, 22),
        (-12.334659958, -15.12, 22),
        (12.334659958, -15.12, 22),
        (20.828427125, -23.948427125, 22),
        (-12.334659958, -25.12, 24),
        (-20.828427125, -16.291572875, 24),
        (-20.828427125, -23.948427125, 24),
        (22, -20.12, 24),
        (20.828427125, -16.291572875, 24),
        (-12.334659958, -25.12, 22),
        (-6.669319917, -25.12, 23),
        (6.669319917, -25.12, 23),
        (12.334659958, -25.12, 22),
        (-12.334659958, -15.12, 24),
        (20.828427125, -16.291572875, 22),
        (22, -20.12, 22),
        (20.828427125, -23.948427125, 24),
        (-20.828427125, -23.948427125, 22),
        (-22, -20.12, 24),
        (-20.828427125, -16.291572875, 22),
        (-6.669319917, -15.12, 23),
        (6.669319917, -15.12, 23),
        (-6.669319917, -20.12, 22),
        (31.669319917, -2.343145751, 21.656854249),
        (6.669319917, -2.343145751, 21.656854249),
        (6.669319917, -11.56, 24),
        (-6.669319917, -2.343145751, 21.656854249),
        (-31.669319917, -2.343145751, 21.656854249),
        (-31.669319917, -20.12, 24),
    ]]
    fillet(fillet4_edges, radius=FILLET4_R)


solid = part.part
